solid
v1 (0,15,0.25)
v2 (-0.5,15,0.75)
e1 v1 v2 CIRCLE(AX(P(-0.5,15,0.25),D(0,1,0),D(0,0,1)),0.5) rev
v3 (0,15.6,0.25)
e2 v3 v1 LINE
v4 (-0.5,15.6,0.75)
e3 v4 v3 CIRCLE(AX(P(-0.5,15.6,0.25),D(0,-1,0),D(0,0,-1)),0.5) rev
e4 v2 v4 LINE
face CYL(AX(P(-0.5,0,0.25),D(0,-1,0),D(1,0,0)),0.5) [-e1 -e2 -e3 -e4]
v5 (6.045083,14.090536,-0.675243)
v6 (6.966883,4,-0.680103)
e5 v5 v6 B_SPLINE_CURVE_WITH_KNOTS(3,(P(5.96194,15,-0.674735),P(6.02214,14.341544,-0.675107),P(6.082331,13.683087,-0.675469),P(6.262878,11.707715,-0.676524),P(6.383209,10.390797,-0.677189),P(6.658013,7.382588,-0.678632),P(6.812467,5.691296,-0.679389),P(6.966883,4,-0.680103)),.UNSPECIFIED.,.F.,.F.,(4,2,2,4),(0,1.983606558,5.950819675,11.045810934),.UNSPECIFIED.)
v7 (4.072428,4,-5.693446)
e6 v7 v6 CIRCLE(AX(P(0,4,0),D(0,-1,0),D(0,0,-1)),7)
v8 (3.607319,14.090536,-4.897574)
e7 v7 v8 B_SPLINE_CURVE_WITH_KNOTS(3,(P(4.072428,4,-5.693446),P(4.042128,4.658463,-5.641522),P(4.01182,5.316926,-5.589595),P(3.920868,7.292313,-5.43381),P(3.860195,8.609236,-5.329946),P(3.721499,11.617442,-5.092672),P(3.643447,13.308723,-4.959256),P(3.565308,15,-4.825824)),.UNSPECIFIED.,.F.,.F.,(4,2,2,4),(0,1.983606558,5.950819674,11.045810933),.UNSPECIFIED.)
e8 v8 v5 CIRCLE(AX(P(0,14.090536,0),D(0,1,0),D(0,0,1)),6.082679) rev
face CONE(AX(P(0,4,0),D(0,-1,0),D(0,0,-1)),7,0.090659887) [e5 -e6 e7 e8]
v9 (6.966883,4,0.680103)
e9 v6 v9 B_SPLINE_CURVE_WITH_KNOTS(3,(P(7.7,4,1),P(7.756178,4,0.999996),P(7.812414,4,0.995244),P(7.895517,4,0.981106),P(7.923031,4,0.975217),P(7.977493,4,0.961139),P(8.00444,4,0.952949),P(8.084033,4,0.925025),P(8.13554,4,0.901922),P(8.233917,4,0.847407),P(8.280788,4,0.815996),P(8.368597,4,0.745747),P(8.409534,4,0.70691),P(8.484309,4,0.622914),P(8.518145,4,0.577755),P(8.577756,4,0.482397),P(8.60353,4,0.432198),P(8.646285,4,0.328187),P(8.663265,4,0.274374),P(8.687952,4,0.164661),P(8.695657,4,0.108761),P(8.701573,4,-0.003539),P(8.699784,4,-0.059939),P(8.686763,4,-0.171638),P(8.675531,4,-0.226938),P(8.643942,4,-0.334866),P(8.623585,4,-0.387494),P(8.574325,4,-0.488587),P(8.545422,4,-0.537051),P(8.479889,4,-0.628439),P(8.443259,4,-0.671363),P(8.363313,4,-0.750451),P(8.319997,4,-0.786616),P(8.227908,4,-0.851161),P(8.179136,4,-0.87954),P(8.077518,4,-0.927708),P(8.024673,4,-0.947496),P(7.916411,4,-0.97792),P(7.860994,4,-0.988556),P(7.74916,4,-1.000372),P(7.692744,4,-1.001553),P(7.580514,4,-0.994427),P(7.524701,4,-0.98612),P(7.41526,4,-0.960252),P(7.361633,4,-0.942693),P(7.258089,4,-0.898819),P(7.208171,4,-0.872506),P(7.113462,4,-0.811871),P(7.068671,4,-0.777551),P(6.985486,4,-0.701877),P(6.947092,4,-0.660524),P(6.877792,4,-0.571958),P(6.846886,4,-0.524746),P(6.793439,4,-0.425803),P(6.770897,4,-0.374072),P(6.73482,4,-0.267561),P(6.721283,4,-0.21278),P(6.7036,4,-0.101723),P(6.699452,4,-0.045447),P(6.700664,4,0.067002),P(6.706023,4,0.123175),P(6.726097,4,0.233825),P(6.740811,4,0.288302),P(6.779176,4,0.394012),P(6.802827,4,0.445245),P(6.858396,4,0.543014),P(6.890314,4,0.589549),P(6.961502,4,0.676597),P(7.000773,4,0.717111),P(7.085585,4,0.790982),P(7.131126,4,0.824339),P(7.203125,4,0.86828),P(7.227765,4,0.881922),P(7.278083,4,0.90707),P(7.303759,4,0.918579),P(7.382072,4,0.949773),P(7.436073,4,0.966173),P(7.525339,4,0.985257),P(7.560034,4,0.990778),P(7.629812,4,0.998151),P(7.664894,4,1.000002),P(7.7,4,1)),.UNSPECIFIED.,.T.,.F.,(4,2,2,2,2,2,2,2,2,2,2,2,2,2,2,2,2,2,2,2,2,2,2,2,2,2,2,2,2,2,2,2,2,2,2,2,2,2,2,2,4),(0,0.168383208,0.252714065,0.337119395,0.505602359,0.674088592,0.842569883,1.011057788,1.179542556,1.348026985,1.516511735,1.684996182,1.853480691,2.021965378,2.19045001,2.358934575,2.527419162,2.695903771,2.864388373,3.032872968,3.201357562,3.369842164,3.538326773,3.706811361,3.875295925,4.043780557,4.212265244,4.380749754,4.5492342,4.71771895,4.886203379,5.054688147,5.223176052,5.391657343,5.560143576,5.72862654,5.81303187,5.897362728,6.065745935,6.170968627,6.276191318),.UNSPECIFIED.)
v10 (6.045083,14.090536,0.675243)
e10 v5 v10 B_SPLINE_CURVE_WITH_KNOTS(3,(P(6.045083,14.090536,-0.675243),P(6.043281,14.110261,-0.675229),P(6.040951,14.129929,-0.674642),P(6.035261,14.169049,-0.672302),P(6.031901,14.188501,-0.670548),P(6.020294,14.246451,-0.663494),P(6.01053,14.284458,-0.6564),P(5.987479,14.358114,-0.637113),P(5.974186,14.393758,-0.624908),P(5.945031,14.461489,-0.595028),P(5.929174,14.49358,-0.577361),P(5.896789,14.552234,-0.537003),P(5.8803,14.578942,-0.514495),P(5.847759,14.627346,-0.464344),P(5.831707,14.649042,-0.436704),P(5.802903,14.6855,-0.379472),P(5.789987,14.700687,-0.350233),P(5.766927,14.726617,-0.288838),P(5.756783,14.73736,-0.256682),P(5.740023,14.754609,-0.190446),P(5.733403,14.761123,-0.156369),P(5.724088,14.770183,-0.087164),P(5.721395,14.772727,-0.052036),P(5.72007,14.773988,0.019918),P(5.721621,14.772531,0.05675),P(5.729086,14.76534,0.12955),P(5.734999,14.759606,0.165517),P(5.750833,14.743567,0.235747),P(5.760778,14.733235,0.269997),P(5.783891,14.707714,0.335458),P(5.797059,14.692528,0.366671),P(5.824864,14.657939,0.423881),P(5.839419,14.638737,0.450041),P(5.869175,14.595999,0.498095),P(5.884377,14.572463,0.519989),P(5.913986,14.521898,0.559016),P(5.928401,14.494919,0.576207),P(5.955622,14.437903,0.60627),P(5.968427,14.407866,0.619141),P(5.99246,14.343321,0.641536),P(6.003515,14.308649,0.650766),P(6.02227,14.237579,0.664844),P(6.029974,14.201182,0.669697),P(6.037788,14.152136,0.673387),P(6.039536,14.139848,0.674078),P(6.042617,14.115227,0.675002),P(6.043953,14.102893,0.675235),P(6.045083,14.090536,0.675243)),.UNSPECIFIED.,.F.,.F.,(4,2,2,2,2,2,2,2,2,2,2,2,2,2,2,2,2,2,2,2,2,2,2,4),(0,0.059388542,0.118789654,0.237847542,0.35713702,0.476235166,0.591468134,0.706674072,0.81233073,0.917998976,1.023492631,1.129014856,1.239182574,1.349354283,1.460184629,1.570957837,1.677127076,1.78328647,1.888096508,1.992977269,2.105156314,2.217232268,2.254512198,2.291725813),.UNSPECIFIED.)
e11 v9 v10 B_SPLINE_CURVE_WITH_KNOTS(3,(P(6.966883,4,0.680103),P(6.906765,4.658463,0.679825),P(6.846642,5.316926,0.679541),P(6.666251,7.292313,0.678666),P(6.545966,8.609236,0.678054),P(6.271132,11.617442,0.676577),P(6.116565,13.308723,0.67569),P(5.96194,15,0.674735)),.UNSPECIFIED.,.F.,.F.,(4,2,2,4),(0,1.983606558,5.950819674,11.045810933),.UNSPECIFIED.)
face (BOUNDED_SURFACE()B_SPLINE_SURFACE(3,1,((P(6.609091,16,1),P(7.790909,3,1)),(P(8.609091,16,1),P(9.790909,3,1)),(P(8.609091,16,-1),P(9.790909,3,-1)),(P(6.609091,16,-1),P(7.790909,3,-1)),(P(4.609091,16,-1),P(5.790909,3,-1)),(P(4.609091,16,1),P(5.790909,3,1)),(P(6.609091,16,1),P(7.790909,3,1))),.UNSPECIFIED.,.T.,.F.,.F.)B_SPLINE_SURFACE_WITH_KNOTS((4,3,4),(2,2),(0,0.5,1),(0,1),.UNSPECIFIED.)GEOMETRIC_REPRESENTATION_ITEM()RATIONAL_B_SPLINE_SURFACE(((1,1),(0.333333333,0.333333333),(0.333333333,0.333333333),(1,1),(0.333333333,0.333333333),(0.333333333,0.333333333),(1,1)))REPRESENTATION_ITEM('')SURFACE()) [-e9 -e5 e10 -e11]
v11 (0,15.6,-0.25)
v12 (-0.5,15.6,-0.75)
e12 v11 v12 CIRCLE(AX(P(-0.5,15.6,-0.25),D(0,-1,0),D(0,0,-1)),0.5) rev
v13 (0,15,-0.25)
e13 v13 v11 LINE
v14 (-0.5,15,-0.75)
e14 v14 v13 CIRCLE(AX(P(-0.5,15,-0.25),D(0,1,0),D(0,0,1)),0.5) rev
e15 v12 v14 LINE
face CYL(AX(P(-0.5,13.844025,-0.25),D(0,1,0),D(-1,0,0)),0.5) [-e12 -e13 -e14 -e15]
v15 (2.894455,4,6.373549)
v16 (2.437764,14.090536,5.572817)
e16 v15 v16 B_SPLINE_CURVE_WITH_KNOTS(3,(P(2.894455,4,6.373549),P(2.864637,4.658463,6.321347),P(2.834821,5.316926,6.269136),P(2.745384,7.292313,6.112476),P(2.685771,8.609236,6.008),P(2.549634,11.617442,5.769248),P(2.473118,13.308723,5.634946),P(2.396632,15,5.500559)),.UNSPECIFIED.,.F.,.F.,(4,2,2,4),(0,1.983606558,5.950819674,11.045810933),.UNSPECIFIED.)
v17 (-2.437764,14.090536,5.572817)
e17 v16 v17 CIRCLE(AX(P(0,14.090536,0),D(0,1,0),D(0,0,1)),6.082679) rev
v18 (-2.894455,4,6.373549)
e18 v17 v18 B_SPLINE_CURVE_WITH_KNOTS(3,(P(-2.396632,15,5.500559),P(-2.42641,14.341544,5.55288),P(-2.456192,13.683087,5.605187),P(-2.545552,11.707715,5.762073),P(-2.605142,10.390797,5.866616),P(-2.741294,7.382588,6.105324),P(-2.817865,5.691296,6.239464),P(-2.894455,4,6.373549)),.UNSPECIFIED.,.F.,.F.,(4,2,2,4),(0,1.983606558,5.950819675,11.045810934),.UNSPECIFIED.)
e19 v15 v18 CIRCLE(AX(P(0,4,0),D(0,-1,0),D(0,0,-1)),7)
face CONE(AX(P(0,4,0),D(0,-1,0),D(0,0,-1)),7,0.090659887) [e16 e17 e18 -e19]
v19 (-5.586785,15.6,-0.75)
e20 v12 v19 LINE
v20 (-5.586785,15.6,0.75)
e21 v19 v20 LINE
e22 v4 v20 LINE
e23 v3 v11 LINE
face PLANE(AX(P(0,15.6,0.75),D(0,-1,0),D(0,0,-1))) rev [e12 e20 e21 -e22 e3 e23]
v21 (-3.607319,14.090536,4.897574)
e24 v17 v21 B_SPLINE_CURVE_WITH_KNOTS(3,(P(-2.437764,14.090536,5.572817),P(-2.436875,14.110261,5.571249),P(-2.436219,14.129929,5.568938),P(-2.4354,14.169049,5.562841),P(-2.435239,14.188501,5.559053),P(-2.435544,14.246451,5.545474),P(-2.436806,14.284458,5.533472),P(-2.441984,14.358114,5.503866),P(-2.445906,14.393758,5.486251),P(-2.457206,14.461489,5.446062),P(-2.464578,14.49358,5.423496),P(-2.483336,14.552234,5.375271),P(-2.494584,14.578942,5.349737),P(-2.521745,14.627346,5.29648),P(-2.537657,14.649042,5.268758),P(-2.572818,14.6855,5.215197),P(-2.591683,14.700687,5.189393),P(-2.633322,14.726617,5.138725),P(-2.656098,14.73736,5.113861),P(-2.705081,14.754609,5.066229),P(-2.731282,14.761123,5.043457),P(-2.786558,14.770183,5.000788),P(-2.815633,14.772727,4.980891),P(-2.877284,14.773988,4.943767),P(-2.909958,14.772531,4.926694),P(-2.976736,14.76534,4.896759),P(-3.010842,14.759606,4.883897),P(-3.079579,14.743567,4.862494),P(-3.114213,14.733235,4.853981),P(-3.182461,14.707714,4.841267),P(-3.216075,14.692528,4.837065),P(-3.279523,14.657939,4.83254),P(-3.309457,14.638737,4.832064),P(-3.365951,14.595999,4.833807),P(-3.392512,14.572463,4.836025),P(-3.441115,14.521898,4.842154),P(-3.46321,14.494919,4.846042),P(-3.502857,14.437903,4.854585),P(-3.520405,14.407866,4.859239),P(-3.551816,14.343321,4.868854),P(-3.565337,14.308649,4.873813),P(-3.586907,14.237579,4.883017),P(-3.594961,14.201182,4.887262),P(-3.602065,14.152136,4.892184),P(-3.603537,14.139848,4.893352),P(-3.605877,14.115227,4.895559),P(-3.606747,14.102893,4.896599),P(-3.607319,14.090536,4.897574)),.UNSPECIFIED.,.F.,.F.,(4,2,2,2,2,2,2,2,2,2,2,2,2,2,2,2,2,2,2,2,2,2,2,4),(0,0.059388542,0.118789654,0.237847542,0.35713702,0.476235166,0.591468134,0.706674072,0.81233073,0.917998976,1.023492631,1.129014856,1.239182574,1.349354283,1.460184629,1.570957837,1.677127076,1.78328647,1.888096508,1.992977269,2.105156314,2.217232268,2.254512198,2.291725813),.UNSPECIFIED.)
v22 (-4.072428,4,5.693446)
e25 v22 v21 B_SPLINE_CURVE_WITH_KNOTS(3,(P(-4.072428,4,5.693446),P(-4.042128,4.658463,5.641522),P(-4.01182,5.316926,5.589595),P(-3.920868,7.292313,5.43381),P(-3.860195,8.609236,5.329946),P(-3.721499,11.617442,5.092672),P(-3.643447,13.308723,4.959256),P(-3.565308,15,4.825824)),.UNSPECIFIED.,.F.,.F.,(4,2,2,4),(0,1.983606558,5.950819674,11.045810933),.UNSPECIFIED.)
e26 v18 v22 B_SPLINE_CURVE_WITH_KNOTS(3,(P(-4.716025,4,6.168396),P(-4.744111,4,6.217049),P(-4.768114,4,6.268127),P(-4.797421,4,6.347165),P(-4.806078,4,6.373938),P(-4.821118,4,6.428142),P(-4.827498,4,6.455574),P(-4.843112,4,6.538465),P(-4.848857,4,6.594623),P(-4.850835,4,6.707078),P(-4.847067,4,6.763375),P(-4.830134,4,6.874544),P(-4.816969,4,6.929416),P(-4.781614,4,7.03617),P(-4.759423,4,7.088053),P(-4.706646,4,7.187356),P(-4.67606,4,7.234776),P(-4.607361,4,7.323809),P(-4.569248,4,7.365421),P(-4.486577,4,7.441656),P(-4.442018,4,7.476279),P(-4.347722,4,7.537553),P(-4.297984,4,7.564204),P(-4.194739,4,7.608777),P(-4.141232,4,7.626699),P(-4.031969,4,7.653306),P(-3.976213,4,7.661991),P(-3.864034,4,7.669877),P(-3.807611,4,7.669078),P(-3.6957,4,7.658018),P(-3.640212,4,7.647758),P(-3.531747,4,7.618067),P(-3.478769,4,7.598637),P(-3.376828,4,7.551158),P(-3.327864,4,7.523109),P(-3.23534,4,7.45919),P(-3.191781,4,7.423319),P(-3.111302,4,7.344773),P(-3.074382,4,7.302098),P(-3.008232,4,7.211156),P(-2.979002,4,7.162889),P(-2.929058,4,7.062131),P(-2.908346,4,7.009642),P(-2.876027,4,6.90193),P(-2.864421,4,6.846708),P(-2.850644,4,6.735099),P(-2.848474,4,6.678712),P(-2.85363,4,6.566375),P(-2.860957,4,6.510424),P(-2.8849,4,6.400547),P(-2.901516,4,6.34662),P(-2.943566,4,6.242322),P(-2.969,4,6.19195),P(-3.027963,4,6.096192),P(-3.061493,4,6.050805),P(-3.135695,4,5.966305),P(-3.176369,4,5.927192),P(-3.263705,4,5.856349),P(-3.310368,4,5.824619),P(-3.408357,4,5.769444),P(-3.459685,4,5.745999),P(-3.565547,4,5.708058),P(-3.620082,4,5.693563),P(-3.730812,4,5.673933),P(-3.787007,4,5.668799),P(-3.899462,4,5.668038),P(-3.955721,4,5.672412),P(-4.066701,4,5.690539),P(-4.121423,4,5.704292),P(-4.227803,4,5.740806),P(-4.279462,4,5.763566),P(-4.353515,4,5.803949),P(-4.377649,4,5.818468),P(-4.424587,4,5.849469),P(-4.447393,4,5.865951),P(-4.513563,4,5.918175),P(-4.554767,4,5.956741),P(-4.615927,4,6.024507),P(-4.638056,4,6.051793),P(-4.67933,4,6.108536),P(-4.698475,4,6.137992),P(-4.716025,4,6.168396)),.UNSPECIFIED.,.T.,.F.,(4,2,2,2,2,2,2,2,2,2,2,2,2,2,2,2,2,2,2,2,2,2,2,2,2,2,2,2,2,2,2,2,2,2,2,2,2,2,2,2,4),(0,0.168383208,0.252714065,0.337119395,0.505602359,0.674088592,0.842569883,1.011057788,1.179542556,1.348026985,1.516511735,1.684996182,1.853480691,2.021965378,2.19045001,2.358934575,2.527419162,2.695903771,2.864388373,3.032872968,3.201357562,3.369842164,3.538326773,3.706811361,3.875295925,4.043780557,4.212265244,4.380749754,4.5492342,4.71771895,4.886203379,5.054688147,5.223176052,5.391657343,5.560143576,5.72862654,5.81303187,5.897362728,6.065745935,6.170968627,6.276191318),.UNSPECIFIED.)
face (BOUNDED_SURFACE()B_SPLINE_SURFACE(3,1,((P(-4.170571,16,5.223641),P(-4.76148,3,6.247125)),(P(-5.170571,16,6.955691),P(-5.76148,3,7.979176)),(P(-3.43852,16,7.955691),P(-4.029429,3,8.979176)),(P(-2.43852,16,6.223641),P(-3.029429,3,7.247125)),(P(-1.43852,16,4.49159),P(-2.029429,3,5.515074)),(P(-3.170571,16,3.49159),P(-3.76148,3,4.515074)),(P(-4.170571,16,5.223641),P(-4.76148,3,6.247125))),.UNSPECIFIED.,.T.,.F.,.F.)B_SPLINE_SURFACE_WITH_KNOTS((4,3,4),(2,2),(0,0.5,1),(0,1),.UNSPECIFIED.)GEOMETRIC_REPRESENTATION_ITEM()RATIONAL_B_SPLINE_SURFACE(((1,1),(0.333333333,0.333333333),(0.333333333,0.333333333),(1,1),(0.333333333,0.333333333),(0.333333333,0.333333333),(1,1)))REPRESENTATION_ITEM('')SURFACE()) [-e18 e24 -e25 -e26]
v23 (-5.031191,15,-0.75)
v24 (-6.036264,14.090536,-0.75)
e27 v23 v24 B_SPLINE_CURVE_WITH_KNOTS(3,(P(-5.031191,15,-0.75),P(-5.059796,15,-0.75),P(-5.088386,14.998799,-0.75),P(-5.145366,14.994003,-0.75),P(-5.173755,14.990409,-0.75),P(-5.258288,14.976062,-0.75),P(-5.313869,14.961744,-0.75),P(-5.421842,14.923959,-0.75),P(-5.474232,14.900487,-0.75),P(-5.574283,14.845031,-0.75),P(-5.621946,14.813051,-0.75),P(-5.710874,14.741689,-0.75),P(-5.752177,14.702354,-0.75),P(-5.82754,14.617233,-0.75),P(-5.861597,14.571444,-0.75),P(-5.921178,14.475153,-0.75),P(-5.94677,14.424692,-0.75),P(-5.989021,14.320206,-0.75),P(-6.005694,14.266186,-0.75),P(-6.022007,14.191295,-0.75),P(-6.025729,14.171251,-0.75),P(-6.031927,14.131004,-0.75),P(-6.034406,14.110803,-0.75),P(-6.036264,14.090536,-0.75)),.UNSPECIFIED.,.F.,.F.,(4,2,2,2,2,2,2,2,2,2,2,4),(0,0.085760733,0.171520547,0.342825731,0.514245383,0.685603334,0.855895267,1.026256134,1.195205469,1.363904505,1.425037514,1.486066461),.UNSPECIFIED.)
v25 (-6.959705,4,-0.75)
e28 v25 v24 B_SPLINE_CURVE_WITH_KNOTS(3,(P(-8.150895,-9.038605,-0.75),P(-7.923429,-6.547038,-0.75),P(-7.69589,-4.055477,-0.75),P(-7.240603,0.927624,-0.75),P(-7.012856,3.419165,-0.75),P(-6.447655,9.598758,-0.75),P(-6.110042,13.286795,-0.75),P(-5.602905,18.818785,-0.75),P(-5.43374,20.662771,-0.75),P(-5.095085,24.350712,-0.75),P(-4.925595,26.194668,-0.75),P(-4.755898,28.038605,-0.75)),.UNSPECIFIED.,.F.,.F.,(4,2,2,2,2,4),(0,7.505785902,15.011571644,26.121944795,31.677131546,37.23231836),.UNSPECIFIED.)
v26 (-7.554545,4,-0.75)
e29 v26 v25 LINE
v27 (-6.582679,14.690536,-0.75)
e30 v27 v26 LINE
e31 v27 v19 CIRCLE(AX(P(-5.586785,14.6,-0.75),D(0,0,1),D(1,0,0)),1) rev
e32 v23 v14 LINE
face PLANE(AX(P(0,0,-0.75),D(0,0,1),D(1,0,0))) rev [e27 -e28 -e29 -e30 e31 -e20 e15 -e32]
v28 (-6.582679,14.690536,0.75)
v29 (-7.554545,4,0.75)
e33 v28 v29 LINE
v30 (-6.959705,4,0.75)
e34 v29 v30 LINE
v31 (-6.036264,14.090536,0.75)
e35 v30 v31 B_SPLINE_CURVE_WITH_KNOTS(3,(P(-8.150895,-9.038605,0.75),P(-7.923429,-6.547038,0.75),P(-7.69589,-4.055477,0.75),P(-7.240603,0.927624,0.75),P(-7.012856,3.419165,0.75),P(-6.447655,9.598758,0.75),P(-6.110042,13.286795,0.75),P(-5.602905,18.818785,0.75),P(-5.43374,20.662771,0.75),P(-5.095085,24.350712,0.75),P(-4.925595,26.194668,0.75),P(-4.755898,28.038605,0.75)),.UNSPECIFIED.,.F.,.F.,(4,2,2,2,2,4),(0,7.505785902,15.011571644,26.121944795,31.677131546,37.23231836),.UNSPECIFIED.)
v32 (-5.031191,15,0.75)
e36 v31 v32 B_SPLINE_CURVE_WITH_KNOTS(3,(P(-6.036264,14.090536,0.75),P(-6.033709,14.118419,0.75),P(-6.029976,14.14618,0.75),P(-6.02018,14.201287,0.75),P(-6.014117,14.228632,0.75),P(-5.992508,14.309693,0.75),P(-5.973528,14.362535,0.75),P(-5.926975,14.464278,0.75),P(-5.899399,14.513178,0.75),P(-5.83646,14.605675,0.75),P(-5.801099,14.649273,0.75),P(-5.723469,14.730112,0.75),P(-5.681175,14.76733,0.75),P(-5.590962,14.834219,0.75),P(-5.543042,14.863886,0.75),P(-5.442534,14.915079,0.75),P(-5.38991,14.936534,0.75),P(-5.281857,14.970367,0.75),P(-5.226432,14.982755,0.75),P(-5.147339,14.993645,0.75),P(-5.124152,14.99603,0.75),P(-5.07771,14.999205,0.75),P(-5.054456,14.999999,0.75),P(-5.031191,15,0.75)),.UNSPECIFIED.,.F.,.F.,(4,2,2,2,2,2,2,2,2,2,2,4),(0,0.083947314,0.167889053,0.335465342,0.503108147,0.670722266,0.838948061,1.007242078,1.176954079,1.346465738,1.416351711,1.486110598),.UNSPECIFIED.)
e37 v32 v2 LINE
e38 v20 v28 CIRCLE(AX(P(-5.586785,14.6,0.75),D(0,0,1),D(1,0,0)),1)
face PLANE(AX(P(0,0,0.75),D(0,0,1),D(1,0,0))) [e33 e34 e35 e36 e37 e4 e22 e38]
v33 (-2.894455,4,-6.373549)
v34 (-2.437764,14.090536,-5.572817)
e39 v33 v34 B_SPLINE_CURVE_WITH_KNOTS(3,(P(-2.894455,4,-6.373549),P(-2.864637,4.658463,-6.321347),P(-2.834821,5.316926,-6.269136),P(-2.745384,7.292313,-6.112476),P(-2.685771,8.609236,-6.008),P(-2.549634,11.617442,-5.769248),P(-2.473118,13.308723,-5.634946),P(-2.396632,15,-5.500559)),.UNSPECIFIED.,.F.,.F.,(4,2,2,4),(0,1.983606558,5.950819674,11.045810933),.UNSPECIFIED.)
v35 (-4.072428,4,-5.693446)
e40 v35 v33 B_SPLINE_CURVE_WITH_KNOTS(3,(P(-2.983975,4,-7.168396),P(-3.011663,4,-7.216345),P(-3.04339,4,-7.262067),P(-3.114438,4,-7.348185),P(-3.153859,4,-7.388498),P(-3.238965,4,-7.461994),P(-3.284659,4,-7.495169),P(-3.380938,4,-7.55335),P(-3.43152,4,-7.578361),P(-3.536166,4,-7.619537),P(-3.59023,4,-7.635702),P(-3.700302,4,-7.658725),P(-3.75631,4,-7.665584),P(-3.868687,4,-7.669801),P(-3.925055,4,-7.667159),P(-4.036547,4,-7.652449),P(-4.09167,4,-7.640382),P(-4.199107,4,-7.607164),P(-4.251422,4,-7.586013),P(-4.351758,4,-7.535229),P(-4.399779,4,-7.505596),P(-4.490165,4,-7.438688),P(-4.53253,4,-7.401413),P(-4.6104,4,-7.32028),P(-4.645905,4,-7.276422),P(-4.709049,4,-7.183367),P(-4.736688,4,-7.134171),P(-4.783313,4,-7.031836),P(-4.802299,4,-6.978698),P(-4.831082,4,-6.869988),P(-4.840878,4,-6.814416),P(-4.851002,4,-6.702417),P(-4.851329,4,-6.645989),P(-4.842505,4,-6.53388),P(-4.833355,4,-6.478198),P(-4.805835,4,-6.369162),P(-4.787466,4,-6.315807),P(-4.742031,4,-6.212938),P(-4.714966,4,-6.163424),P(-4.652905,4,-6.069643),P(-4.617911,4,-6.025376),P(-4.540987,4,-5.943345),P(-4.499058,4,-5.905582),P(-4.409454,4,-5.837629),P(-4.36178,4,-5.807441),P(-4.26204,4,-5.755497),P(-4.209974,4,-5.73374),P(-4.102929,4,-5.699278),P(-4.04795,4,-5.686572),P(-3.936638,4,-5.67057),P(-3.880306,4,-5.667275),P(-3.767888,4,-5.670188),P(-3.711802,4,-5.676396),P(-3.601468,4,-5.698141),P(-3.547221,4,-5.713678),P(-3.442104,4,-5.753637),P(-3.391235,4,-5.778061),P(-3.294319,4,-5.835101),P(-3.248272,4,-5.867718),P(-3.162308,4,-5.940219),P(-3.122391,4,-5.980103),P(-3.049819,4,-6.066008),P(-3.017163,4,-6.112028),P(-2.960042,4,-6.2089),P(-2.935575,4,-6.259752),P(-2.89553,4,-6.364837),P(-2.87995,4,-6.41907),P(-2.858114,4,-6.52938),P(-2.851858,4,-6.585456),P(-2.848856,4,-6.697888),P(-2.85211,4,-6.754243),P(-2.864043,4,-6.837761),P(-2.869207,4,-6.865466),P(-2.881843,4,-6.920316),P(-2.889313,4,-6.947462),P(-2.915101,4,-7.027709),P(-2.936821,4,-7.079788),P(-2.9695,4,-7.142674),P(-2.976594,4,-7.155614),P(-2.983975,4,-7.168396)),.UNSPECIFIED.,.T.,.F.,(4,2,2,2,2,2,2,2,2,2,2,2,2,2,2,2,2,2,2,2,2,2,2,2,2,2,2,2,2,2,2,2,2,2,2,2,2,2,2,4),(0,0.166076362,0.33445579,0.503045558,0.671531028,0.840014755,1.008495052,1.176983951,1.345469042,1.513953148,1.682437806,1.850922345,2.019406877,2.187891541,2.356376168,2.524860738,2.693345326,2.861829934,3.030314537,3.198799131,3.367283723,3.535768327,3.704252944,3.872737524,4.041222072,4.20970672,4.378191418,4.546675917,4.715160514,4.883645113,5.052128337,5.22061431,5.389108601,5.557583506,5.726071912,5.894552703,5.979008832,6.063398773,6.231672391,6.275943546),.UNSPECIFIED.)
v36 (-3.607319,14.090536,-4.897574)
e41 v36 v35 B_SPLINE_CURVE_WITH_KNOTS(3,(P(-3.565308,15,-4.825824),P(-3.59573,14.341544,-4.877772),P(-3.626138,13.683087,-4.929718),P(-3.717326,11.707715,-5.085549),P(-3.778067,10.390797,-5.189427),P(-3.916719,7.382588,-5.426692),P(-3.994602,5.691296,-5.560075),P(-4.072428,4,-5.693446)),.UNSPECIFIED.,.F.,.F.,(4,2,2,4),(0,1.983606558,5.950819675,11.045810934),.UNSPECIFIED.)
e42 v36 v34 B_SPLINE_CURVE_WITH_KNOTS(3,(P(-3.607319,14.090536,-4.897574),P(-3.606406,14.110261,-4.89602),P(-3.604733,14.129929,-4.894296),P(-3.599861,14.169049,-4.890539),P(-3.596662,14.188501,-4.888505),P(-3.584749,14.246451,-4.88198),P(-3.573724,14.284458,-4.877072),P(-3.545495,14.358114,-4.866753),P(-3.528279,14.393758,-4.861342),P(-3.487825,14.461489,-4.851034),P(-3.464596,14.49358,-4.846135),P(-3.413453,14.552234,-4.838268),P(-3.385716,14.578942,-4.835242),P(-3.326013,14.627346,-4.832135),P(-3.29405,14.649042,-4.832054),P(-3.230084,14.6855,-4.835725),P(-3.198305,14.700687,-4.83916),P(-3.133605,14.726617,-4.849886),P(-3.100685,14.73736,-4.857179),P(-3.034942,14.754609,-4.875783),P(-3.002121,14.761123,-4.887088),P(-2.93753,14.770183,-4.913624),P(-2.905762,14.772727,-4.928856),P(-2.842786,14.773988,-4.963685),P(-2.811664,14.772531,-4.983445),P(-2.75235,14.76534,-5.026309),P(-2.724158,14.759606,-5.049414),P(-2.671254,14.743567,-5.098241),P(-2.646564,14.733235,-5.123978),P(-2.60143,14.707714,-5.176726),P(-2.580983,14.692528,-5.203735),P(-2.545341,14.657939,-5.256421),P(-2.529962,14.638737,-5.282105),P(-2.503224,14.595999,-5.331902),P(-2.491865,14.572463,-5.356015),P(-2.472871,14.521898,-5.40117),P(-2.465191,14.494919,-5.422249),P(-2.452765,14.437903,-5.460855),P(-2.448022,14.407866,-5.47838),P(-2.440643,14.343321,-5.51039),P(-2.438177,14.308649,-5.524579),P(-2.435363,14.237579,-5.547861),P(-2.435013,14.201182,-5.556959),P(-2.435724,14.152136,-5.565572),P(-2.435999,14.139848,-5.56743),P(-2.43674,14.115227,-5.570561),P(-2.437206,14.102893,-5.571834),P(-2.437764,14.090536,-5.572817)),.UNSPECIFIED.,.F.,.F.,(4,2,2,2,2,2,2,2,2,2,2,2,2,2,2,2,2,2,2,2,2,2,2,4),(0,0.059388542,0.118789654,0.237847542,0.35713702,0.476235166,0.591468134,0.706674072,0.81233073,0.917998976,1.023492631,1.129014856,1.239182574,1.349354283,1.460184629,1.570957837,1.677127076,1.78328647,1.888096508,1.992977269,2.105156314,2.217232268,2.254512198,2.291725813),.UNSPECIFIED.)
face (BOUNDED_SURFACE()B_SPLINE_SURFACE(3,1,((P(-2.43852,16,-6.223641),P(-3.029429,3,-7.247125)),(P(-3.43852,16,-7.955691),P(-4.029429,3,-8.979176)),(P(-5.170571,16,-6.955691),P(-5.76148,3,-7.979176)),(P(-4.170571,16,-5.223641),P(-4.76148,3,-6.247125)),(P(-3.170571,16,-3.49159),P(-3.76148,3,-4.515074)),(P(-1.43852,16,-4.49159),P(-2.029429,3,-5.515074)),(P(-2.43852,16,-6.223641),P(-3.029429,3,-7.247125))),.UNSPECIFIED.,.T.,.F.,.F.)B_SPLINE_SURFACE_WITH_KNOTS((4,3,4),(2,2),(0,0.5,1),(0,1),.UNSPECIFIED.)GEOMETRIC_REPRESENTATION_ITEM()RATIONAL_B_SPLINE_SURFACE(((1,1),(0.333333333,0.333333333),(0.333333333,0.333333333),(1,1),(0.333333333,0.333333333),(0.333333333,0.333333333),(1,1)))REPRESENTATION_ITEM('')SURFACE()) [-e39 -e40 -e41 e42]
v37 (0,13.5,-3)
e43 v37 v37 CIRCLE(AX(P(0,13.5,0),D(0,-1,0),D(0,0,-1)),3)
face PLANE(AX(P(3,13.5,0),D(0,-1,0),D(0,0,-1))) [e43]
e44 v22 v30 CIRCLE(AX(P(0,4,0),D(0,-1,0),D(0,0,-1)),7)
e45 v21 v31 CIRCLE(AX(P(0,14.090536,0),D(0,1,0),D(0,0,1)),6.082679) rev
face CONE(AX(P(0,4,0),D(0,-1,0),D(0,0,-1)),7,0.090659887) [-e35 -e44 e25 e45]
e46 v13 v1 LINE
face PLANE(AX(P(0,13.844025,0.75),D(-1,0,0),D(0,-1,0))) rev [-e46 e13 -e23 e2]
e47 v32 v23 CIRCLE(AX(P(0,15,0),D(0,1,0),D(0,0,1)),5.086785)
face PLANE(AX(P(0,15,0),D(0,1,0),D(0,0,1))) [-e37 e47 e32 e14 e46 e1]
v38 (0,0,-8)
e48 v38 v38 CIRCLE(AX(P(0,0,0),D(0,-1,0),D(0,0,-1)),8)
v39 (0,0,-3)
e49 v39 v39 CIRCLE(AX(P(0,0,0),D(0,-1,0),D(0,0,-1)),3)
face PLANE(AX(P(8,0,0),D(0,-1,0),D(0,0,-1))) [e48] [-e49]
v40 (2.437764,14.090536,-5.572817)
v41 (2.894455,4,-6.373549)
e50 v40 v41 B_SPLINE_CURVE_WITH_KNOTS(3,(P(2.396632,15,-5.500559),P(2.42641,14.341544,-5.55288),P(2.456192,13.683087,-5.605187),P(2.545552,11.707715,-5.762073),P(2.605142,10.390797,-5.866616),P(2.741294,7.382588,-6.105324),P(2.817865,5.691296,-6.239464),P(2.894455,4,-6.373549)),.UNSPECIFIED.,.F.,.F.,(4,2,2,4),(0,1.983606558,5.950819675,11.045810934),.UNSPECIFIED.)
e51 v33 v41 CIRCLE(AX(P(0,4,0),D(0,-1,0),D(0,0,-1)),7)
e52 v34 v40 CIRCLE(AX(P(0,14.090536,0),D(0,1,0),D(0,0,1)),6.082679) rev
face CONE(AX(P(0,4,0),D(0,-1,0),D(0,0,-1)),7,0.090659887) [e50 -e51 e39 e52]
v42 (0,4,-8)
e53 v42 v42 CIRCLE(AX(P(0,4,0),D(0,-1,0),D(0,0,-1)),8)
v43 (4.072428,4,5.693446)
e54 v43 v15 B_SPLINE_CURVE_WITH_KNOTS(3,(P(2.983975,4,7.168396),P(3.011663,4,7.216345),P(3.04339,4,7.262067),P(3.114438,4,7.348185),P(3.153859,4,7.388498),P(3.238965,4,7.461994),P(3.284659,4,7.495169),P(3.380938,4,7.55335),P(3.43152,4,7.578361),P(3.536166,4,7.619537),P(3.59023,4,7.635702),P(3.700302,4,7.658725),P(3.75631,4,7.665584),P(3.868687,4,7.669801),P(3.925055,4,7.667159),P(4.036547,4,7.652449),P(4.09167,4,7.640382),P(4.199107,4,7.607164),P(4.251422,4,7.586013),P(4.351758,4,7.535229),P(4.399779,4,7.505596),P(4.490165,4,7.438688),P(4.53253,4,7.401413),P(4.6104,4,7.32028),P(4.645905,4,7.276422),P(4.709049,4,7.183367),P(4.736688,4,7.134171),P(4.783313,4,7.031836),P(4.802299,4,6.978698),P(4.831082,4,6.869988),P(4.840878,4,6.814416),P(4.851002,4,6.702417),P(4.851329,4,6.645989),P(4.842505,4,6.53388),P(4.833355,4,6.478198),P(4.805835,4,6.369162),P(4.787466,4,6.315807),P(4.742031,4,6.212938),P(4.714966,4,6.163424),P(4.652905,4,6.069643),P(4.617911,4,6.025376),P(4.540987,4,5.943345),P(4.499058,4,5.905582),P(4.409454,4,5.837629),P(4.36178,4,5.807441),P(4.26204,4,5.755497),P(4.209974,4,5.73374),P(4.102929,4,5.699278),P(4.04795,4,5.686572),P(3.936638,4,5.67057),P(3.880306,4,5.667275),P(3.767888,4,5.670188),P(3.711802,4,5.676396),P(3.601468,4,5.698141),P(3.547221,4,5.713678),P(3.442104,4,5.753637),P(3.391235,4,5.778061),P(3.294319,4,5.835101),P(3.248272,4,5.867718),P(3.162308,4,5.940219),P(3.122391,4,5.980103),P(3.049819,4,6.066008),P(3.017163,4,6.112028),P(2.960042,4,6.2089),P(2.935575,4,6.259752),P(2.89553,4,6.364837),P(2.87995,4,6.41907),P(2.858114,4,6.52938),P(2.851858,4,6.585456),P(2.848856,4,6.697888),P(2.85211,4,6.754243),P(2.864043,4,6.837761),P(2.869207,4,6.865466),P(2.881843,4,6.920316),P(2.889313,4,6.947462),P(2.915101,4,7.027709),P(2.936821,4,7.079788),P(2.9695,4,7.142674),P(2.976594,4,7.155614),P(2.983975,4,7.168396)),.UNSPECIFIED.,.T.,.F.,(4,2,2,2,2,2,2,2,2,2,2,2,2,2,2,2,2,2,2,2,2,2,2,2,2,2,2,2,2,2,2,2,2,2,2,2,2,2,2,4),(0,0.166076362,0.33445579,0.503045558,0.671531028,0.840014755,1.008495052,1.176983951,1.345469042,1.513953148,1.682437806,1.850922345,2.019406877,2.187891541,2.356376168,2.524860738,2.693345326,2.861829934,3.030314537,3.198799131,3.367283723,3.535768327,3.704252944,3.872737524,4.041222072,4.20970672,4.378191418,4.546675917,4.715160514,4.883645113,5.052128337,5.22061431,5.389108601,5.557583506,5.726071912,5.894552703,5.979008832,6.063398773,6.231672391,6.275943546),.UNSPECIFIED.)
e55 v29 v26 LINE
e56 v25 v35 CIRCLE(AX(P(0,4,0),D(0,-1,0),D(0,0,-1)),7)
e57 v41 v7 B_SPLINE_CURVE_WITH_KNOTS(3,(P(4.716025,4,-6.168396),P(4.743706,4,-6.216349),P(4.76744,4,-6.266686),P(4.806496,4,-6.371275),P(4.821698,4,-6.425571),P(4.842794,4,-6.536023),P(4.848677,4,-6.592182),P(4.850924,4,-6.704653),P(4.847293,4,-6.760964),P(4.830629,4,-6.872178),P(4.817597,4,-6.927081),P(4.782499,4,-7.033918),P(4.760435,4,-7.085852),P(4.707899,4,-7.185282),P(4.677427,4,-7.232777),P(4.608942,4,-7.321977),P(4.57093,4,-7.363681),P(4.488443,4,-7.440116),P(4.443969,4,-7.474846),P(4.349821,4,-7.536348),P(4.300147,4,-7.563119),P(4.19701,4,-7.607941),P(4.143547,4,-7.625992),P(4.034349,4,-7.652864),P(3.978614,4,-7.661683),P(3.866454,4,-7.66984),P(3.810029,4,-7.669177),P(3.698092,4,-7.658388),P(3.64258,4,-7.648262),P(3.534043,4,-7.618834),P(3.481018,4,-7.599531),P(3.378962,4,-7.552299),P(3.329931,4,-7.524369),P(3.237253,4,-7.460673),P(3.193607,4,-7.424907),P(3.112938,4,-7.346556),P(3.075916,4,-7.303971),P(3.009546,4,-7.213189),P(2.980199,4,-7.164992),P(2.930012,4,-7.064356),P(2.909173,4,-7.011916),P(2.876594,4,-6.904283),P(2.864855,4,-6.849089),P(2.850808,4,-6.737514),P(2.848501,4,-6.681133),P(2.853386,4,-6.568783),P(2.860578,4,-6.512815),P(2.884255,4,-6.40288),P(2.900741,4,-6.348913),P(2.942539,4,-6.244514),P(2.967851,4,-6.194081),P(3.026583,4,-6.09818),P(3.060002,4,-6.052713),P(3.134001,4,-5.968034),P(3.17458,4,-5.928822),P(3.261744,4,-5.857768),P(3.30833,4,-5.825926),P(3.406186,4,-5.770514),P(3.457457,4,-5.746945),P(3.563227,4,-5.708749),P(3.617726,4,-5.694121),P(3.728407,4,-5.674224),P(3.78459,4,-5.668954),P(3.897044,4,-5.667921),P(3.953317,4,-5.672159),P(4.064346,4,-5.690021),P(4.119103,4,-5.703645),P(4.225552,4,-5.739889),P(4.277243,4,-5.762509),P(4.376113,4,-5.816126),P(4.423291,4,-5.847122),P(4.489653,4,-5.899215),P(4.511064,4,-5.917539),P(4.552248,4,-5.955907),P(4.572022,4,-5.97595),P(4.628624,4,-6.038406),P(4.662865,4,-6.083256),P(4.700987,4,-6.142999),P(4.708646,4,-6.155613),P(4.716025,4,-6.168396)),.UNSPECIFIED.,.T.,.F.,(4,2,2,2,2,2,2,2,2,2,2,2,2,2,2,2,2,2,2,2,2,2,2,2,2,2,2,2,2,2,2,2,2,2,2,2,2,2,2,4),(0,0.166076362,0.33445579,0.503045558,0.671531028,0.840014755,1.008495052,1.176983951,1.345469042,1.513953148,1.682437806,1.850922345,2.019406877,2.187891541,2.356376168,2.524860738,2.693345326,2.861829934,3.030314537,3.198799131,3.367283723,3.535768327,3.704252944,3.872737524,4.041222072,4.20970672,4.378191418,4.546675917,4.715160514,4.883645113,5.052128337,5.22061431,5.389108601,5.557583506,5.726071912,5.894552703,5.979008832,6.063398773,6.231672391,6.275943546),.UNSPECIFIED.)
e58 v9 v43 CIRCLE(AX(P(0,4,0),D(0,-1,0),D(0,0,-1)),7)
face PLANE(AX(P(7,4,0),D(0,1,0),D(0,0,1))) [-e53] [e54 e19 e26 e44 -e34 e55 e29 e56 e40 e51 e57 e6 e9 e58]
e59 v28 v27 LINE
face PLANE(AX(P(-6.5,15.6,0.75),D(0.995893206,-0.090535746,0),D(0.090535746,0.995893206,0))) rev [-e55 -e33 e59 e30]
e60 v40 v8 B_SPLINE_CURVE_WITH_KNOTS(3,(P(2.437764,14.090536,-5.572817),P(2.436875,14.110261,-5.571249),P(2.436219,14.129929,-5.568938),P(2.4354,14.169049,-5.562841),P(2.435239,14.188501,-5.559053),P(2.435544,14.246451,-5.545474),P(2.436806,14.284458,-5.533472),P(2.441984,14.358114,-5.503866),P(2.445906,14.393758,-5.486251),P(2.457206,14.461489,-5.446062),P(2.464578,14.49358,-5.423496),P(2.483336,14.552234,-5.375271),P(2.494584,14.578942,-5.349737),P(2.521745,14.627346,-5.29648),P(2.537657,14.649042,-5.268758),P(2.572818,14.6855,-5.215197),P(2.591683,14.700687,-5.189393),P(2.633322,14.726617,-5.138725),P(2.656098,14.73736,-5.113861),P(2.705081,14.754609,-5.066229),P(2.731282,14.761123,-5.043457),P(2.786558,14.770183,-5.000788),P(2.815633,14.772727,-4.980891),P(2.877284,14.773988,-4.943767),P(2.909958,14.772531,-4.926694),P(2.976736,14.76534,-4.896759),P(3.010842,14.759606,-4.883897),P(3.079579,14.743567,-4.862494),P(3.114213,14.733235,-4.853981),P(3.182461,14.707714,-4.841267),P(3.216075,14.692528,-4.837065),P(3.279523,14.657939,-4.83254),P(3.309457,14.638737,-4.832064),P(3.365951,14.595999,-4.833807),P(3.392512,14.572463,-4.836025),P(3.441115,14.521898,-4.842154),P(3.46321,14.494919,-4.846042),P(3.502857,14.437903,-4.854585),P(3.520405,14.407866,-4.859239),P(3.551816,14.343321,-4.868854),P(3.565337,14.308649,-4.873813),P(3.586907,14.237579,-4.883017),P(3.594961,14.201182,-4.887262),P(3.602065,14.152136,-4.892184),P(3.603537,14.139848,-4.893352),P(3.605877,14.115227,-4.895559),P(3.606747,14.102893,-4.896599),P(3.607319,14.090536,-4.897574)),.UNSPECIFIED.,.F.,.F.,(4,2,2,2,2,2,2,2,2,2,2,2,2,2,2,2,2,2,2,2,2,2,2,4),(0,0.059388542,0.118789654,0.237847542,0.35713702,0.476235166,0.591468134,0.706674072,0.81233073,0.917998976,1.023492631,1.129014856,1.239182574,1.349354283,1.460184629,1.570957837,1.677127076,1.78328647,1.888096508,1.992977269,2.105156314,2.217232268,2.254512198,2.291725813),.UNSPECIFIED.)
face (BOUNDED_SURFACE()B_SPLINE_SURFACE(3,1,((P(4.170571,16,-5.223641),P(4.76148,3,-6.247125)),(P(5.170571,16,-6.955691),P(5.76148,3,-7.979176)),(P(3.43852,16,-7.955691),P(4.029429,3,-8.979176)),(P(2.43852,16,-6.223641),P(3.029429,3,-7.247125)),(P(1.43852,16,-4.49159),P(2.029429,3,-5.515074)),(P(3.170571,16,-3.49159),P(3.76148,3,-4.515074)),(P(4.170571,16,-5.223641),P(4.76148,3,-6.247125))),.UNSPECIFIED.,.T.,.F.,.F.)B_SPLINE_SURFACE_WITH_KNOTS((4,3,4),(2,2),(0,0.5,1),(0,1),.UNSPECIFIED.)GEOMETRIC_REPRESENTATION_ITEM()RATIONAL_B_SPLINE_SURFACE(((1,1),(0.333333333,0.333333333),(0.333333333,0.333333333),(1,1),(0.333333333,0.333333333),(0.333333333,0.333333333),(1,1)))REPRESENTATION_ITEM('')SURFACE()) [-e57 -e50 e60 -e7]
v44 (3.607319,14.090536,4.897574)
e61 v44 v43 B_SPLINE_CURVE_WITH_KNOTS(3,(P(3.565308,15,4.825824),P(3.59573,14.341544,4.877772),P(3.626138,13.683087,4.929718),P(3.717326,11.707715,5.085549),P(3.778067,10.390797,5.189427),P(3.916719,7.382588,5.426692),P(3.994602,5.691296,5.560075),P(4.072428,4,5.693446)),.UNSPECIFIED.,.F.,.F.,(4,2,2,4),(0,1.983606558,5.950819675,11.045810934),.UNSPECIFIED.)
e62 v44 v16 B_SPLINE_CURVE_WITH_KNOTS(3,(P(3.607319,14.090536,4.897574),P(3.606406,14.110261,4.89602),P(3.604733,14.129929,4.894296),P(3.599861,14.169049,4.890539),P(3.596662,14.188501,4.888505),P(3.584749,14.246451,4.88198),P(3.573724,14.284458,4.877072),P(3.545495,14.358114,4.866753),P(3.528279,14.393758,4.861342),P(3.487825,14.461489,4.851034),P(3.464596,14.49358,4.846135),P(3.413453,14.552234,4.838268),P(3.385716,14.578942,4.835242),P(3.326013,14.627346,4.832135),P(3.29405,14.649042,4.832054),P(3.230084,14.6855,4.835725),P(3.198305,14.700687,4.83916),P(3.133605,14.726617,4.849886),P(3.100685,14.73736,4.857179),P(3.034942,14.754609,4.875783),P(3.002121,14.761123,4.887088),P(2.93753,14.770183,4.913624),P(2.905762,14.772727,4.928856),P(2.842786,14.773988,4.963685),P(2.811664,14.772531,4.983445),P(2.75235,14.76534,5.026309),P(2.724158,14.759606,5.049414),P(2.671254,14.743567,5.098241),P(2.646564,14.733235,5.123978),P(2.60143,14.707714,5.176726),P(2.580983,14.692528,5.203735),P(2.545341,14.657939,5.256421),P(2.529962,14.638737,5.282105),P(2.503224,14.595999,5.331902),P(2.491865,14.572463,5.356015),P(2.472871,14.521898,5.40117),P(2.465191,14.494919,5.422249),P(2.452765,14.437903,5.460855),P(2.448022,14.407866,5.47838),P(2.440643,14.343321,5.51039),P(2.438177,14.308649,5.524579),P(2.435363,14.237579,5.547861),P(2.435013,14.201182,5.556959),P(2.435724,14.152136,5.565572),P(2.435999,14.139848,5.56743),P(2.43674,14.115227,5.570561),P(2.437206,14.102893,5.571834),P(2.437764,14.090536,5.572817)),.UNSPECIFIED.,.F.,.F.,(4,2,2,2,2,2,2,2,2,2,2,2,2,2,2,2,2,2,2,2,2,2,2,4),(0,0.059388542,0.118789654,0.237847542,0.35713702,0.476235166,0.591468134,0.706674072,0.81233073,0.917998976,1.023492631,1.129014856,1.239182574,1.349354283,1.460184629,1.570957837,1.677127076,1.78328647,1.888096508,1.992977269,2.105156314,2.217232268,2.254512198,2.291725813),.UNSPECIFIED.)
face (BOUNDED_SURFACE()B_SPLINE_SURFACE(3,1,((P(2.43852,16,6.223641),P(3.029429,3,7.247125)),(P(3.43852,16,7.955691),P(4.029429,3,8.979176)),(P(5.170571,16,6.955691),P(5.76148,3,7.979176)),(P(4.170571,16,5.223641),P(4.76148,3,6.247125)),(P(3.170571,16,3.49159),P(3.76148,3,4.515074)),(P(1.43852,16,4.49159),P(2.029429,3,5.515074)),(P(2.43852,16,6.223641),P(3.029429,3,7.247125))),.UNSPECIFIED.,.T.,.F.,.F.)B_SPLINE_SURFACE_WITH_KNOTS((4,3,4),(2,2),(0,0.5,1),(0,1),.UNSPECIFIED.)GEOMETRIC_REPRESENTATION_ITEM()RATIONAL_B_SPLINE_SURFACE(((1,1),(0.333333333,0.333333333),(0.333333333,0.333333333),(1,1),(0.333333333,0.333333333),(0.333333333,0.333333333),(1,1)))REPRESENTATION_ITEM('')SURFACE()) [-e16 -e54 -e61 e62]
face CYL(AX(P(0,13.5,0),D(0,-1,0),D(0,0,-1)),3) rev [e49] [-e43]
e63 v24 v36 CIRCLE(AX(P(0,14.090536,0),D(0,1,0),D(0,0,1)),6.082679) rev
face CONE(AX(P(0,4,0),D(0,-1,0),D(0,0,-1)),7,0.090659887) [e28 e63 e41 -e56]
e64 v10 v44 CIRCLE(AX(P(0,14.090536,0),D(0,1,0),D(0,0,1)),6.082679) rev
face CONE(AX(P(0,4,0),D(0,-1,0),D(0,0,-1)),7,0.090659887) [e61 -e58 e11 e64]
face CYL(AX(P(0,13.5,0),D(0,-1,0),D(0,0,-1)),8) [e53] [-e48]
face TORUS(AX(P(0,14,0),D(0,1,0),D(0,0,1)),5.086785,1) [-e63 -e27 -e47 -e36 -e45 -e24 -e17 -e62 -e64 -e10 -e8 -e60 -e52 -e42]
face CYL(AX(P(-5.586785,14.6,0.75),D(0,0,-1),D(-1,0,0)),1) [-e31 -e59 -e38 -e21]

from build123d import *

# Parameters (mm, degrees)
BOSS_EXTRU_1_DEPTH           = 0.75
ESQUISSE5_R                  = 1
R_P_TITION_CIRCULAIRE1_COUNT = 6
CONG_1_R                     = 1
CONG_3_R                     = 1
CONG_2_R                     = 0.5


with BuildPart() as part:
    # Esquisse1 → Révolution1 (revolve)
    with BuildSketch(Plane.XY):
        Polygon((0, 13.5), (0, 15), (6, 15), (7, 4), (8, 4), (8, 0), (3, 0), (3, 13.5), align=None)
    revolve(axis=Axis((0, 13.5, 0), (0, 1, 0)))

    # Esquisse2 → Boss.-Extru.1 (add, symmetric)
    with BuildSketch(Plane.XY):
        Polygon((0, 13.844024699), (0, 15.6), (-6.5, 15.6), (-7.917715453, 0.005130014), (-6.239023438, 0), (-4.974172869, 13.844024699), align=None)
    extrude(amount=BOSS_EXTRU_1_DEPTH, both=True)

    # Enlèvement de matière-Balayage1: sweep along a path in Esquisse4
    with BuildLine(Plane.XY) as enl_vement_de_mati_re_balayage1_path:
        Line((6, 15), (7, 4))
    # Esquisse5 → Enlèvement de matière-Balayage1 (sweep, cut)
    with BuildSketch(Plane(origin=(0, 15, 0), x_dir=(1, 0, 0), z_dir=(0, 1, 0))):
        with Locations((6.7, 0)):
            Circle(ESQUISSE5_R)
    enl_vement_de_mati_re_balayage1 = sweep(path=enl_vement_de_mati_re_balayage1_path.line, mode=Mode.SUBTRACT)

    # Répétition circulaire1: Enlèvement de matière-Balayage1 ×6 about axis, 1 skipped
    r_p_tition_circulaire1_axis = Axis((0, 4, 0), (0, -1, 0))
    add([enl_vement_de_mati_re_balayage1.rotate(r_p_tition_circulaire1_axis, i * 360 / R_P_TITION_CIRCULAIRE1_COUNT) for i in range(1, R_P_TITION_CIRCULAIRE1_COUNT) if i not in (3,)], mode=Mode.SUBTRACT)

    # Congé1
    cong_1_edges = [part.edges().sort_by_distance(p)[0] for p in [
        (-5.177098565, 15, 3.03276284),
    ]]
    fillet(cong_1_edges, radius=CONG_1_R)

    # Congé3
    cong_3_edges = [part.edges().sort_by_distance(p)[0] for p in [
        (-6.5, 15.6, 0),
    ]]
    fillet(cong_3_edges, radius=CONG_3_R)

    # Congé2
    cong_2_edges = [part.edges().sort_by_distance(p)[0] for p in [
        (0, 15.3, -0.75),
        (0, 15.3, 0.75),
    ]]
    fillet(cong_2_edges, radius=CONG_2_R)


solid = part.part
